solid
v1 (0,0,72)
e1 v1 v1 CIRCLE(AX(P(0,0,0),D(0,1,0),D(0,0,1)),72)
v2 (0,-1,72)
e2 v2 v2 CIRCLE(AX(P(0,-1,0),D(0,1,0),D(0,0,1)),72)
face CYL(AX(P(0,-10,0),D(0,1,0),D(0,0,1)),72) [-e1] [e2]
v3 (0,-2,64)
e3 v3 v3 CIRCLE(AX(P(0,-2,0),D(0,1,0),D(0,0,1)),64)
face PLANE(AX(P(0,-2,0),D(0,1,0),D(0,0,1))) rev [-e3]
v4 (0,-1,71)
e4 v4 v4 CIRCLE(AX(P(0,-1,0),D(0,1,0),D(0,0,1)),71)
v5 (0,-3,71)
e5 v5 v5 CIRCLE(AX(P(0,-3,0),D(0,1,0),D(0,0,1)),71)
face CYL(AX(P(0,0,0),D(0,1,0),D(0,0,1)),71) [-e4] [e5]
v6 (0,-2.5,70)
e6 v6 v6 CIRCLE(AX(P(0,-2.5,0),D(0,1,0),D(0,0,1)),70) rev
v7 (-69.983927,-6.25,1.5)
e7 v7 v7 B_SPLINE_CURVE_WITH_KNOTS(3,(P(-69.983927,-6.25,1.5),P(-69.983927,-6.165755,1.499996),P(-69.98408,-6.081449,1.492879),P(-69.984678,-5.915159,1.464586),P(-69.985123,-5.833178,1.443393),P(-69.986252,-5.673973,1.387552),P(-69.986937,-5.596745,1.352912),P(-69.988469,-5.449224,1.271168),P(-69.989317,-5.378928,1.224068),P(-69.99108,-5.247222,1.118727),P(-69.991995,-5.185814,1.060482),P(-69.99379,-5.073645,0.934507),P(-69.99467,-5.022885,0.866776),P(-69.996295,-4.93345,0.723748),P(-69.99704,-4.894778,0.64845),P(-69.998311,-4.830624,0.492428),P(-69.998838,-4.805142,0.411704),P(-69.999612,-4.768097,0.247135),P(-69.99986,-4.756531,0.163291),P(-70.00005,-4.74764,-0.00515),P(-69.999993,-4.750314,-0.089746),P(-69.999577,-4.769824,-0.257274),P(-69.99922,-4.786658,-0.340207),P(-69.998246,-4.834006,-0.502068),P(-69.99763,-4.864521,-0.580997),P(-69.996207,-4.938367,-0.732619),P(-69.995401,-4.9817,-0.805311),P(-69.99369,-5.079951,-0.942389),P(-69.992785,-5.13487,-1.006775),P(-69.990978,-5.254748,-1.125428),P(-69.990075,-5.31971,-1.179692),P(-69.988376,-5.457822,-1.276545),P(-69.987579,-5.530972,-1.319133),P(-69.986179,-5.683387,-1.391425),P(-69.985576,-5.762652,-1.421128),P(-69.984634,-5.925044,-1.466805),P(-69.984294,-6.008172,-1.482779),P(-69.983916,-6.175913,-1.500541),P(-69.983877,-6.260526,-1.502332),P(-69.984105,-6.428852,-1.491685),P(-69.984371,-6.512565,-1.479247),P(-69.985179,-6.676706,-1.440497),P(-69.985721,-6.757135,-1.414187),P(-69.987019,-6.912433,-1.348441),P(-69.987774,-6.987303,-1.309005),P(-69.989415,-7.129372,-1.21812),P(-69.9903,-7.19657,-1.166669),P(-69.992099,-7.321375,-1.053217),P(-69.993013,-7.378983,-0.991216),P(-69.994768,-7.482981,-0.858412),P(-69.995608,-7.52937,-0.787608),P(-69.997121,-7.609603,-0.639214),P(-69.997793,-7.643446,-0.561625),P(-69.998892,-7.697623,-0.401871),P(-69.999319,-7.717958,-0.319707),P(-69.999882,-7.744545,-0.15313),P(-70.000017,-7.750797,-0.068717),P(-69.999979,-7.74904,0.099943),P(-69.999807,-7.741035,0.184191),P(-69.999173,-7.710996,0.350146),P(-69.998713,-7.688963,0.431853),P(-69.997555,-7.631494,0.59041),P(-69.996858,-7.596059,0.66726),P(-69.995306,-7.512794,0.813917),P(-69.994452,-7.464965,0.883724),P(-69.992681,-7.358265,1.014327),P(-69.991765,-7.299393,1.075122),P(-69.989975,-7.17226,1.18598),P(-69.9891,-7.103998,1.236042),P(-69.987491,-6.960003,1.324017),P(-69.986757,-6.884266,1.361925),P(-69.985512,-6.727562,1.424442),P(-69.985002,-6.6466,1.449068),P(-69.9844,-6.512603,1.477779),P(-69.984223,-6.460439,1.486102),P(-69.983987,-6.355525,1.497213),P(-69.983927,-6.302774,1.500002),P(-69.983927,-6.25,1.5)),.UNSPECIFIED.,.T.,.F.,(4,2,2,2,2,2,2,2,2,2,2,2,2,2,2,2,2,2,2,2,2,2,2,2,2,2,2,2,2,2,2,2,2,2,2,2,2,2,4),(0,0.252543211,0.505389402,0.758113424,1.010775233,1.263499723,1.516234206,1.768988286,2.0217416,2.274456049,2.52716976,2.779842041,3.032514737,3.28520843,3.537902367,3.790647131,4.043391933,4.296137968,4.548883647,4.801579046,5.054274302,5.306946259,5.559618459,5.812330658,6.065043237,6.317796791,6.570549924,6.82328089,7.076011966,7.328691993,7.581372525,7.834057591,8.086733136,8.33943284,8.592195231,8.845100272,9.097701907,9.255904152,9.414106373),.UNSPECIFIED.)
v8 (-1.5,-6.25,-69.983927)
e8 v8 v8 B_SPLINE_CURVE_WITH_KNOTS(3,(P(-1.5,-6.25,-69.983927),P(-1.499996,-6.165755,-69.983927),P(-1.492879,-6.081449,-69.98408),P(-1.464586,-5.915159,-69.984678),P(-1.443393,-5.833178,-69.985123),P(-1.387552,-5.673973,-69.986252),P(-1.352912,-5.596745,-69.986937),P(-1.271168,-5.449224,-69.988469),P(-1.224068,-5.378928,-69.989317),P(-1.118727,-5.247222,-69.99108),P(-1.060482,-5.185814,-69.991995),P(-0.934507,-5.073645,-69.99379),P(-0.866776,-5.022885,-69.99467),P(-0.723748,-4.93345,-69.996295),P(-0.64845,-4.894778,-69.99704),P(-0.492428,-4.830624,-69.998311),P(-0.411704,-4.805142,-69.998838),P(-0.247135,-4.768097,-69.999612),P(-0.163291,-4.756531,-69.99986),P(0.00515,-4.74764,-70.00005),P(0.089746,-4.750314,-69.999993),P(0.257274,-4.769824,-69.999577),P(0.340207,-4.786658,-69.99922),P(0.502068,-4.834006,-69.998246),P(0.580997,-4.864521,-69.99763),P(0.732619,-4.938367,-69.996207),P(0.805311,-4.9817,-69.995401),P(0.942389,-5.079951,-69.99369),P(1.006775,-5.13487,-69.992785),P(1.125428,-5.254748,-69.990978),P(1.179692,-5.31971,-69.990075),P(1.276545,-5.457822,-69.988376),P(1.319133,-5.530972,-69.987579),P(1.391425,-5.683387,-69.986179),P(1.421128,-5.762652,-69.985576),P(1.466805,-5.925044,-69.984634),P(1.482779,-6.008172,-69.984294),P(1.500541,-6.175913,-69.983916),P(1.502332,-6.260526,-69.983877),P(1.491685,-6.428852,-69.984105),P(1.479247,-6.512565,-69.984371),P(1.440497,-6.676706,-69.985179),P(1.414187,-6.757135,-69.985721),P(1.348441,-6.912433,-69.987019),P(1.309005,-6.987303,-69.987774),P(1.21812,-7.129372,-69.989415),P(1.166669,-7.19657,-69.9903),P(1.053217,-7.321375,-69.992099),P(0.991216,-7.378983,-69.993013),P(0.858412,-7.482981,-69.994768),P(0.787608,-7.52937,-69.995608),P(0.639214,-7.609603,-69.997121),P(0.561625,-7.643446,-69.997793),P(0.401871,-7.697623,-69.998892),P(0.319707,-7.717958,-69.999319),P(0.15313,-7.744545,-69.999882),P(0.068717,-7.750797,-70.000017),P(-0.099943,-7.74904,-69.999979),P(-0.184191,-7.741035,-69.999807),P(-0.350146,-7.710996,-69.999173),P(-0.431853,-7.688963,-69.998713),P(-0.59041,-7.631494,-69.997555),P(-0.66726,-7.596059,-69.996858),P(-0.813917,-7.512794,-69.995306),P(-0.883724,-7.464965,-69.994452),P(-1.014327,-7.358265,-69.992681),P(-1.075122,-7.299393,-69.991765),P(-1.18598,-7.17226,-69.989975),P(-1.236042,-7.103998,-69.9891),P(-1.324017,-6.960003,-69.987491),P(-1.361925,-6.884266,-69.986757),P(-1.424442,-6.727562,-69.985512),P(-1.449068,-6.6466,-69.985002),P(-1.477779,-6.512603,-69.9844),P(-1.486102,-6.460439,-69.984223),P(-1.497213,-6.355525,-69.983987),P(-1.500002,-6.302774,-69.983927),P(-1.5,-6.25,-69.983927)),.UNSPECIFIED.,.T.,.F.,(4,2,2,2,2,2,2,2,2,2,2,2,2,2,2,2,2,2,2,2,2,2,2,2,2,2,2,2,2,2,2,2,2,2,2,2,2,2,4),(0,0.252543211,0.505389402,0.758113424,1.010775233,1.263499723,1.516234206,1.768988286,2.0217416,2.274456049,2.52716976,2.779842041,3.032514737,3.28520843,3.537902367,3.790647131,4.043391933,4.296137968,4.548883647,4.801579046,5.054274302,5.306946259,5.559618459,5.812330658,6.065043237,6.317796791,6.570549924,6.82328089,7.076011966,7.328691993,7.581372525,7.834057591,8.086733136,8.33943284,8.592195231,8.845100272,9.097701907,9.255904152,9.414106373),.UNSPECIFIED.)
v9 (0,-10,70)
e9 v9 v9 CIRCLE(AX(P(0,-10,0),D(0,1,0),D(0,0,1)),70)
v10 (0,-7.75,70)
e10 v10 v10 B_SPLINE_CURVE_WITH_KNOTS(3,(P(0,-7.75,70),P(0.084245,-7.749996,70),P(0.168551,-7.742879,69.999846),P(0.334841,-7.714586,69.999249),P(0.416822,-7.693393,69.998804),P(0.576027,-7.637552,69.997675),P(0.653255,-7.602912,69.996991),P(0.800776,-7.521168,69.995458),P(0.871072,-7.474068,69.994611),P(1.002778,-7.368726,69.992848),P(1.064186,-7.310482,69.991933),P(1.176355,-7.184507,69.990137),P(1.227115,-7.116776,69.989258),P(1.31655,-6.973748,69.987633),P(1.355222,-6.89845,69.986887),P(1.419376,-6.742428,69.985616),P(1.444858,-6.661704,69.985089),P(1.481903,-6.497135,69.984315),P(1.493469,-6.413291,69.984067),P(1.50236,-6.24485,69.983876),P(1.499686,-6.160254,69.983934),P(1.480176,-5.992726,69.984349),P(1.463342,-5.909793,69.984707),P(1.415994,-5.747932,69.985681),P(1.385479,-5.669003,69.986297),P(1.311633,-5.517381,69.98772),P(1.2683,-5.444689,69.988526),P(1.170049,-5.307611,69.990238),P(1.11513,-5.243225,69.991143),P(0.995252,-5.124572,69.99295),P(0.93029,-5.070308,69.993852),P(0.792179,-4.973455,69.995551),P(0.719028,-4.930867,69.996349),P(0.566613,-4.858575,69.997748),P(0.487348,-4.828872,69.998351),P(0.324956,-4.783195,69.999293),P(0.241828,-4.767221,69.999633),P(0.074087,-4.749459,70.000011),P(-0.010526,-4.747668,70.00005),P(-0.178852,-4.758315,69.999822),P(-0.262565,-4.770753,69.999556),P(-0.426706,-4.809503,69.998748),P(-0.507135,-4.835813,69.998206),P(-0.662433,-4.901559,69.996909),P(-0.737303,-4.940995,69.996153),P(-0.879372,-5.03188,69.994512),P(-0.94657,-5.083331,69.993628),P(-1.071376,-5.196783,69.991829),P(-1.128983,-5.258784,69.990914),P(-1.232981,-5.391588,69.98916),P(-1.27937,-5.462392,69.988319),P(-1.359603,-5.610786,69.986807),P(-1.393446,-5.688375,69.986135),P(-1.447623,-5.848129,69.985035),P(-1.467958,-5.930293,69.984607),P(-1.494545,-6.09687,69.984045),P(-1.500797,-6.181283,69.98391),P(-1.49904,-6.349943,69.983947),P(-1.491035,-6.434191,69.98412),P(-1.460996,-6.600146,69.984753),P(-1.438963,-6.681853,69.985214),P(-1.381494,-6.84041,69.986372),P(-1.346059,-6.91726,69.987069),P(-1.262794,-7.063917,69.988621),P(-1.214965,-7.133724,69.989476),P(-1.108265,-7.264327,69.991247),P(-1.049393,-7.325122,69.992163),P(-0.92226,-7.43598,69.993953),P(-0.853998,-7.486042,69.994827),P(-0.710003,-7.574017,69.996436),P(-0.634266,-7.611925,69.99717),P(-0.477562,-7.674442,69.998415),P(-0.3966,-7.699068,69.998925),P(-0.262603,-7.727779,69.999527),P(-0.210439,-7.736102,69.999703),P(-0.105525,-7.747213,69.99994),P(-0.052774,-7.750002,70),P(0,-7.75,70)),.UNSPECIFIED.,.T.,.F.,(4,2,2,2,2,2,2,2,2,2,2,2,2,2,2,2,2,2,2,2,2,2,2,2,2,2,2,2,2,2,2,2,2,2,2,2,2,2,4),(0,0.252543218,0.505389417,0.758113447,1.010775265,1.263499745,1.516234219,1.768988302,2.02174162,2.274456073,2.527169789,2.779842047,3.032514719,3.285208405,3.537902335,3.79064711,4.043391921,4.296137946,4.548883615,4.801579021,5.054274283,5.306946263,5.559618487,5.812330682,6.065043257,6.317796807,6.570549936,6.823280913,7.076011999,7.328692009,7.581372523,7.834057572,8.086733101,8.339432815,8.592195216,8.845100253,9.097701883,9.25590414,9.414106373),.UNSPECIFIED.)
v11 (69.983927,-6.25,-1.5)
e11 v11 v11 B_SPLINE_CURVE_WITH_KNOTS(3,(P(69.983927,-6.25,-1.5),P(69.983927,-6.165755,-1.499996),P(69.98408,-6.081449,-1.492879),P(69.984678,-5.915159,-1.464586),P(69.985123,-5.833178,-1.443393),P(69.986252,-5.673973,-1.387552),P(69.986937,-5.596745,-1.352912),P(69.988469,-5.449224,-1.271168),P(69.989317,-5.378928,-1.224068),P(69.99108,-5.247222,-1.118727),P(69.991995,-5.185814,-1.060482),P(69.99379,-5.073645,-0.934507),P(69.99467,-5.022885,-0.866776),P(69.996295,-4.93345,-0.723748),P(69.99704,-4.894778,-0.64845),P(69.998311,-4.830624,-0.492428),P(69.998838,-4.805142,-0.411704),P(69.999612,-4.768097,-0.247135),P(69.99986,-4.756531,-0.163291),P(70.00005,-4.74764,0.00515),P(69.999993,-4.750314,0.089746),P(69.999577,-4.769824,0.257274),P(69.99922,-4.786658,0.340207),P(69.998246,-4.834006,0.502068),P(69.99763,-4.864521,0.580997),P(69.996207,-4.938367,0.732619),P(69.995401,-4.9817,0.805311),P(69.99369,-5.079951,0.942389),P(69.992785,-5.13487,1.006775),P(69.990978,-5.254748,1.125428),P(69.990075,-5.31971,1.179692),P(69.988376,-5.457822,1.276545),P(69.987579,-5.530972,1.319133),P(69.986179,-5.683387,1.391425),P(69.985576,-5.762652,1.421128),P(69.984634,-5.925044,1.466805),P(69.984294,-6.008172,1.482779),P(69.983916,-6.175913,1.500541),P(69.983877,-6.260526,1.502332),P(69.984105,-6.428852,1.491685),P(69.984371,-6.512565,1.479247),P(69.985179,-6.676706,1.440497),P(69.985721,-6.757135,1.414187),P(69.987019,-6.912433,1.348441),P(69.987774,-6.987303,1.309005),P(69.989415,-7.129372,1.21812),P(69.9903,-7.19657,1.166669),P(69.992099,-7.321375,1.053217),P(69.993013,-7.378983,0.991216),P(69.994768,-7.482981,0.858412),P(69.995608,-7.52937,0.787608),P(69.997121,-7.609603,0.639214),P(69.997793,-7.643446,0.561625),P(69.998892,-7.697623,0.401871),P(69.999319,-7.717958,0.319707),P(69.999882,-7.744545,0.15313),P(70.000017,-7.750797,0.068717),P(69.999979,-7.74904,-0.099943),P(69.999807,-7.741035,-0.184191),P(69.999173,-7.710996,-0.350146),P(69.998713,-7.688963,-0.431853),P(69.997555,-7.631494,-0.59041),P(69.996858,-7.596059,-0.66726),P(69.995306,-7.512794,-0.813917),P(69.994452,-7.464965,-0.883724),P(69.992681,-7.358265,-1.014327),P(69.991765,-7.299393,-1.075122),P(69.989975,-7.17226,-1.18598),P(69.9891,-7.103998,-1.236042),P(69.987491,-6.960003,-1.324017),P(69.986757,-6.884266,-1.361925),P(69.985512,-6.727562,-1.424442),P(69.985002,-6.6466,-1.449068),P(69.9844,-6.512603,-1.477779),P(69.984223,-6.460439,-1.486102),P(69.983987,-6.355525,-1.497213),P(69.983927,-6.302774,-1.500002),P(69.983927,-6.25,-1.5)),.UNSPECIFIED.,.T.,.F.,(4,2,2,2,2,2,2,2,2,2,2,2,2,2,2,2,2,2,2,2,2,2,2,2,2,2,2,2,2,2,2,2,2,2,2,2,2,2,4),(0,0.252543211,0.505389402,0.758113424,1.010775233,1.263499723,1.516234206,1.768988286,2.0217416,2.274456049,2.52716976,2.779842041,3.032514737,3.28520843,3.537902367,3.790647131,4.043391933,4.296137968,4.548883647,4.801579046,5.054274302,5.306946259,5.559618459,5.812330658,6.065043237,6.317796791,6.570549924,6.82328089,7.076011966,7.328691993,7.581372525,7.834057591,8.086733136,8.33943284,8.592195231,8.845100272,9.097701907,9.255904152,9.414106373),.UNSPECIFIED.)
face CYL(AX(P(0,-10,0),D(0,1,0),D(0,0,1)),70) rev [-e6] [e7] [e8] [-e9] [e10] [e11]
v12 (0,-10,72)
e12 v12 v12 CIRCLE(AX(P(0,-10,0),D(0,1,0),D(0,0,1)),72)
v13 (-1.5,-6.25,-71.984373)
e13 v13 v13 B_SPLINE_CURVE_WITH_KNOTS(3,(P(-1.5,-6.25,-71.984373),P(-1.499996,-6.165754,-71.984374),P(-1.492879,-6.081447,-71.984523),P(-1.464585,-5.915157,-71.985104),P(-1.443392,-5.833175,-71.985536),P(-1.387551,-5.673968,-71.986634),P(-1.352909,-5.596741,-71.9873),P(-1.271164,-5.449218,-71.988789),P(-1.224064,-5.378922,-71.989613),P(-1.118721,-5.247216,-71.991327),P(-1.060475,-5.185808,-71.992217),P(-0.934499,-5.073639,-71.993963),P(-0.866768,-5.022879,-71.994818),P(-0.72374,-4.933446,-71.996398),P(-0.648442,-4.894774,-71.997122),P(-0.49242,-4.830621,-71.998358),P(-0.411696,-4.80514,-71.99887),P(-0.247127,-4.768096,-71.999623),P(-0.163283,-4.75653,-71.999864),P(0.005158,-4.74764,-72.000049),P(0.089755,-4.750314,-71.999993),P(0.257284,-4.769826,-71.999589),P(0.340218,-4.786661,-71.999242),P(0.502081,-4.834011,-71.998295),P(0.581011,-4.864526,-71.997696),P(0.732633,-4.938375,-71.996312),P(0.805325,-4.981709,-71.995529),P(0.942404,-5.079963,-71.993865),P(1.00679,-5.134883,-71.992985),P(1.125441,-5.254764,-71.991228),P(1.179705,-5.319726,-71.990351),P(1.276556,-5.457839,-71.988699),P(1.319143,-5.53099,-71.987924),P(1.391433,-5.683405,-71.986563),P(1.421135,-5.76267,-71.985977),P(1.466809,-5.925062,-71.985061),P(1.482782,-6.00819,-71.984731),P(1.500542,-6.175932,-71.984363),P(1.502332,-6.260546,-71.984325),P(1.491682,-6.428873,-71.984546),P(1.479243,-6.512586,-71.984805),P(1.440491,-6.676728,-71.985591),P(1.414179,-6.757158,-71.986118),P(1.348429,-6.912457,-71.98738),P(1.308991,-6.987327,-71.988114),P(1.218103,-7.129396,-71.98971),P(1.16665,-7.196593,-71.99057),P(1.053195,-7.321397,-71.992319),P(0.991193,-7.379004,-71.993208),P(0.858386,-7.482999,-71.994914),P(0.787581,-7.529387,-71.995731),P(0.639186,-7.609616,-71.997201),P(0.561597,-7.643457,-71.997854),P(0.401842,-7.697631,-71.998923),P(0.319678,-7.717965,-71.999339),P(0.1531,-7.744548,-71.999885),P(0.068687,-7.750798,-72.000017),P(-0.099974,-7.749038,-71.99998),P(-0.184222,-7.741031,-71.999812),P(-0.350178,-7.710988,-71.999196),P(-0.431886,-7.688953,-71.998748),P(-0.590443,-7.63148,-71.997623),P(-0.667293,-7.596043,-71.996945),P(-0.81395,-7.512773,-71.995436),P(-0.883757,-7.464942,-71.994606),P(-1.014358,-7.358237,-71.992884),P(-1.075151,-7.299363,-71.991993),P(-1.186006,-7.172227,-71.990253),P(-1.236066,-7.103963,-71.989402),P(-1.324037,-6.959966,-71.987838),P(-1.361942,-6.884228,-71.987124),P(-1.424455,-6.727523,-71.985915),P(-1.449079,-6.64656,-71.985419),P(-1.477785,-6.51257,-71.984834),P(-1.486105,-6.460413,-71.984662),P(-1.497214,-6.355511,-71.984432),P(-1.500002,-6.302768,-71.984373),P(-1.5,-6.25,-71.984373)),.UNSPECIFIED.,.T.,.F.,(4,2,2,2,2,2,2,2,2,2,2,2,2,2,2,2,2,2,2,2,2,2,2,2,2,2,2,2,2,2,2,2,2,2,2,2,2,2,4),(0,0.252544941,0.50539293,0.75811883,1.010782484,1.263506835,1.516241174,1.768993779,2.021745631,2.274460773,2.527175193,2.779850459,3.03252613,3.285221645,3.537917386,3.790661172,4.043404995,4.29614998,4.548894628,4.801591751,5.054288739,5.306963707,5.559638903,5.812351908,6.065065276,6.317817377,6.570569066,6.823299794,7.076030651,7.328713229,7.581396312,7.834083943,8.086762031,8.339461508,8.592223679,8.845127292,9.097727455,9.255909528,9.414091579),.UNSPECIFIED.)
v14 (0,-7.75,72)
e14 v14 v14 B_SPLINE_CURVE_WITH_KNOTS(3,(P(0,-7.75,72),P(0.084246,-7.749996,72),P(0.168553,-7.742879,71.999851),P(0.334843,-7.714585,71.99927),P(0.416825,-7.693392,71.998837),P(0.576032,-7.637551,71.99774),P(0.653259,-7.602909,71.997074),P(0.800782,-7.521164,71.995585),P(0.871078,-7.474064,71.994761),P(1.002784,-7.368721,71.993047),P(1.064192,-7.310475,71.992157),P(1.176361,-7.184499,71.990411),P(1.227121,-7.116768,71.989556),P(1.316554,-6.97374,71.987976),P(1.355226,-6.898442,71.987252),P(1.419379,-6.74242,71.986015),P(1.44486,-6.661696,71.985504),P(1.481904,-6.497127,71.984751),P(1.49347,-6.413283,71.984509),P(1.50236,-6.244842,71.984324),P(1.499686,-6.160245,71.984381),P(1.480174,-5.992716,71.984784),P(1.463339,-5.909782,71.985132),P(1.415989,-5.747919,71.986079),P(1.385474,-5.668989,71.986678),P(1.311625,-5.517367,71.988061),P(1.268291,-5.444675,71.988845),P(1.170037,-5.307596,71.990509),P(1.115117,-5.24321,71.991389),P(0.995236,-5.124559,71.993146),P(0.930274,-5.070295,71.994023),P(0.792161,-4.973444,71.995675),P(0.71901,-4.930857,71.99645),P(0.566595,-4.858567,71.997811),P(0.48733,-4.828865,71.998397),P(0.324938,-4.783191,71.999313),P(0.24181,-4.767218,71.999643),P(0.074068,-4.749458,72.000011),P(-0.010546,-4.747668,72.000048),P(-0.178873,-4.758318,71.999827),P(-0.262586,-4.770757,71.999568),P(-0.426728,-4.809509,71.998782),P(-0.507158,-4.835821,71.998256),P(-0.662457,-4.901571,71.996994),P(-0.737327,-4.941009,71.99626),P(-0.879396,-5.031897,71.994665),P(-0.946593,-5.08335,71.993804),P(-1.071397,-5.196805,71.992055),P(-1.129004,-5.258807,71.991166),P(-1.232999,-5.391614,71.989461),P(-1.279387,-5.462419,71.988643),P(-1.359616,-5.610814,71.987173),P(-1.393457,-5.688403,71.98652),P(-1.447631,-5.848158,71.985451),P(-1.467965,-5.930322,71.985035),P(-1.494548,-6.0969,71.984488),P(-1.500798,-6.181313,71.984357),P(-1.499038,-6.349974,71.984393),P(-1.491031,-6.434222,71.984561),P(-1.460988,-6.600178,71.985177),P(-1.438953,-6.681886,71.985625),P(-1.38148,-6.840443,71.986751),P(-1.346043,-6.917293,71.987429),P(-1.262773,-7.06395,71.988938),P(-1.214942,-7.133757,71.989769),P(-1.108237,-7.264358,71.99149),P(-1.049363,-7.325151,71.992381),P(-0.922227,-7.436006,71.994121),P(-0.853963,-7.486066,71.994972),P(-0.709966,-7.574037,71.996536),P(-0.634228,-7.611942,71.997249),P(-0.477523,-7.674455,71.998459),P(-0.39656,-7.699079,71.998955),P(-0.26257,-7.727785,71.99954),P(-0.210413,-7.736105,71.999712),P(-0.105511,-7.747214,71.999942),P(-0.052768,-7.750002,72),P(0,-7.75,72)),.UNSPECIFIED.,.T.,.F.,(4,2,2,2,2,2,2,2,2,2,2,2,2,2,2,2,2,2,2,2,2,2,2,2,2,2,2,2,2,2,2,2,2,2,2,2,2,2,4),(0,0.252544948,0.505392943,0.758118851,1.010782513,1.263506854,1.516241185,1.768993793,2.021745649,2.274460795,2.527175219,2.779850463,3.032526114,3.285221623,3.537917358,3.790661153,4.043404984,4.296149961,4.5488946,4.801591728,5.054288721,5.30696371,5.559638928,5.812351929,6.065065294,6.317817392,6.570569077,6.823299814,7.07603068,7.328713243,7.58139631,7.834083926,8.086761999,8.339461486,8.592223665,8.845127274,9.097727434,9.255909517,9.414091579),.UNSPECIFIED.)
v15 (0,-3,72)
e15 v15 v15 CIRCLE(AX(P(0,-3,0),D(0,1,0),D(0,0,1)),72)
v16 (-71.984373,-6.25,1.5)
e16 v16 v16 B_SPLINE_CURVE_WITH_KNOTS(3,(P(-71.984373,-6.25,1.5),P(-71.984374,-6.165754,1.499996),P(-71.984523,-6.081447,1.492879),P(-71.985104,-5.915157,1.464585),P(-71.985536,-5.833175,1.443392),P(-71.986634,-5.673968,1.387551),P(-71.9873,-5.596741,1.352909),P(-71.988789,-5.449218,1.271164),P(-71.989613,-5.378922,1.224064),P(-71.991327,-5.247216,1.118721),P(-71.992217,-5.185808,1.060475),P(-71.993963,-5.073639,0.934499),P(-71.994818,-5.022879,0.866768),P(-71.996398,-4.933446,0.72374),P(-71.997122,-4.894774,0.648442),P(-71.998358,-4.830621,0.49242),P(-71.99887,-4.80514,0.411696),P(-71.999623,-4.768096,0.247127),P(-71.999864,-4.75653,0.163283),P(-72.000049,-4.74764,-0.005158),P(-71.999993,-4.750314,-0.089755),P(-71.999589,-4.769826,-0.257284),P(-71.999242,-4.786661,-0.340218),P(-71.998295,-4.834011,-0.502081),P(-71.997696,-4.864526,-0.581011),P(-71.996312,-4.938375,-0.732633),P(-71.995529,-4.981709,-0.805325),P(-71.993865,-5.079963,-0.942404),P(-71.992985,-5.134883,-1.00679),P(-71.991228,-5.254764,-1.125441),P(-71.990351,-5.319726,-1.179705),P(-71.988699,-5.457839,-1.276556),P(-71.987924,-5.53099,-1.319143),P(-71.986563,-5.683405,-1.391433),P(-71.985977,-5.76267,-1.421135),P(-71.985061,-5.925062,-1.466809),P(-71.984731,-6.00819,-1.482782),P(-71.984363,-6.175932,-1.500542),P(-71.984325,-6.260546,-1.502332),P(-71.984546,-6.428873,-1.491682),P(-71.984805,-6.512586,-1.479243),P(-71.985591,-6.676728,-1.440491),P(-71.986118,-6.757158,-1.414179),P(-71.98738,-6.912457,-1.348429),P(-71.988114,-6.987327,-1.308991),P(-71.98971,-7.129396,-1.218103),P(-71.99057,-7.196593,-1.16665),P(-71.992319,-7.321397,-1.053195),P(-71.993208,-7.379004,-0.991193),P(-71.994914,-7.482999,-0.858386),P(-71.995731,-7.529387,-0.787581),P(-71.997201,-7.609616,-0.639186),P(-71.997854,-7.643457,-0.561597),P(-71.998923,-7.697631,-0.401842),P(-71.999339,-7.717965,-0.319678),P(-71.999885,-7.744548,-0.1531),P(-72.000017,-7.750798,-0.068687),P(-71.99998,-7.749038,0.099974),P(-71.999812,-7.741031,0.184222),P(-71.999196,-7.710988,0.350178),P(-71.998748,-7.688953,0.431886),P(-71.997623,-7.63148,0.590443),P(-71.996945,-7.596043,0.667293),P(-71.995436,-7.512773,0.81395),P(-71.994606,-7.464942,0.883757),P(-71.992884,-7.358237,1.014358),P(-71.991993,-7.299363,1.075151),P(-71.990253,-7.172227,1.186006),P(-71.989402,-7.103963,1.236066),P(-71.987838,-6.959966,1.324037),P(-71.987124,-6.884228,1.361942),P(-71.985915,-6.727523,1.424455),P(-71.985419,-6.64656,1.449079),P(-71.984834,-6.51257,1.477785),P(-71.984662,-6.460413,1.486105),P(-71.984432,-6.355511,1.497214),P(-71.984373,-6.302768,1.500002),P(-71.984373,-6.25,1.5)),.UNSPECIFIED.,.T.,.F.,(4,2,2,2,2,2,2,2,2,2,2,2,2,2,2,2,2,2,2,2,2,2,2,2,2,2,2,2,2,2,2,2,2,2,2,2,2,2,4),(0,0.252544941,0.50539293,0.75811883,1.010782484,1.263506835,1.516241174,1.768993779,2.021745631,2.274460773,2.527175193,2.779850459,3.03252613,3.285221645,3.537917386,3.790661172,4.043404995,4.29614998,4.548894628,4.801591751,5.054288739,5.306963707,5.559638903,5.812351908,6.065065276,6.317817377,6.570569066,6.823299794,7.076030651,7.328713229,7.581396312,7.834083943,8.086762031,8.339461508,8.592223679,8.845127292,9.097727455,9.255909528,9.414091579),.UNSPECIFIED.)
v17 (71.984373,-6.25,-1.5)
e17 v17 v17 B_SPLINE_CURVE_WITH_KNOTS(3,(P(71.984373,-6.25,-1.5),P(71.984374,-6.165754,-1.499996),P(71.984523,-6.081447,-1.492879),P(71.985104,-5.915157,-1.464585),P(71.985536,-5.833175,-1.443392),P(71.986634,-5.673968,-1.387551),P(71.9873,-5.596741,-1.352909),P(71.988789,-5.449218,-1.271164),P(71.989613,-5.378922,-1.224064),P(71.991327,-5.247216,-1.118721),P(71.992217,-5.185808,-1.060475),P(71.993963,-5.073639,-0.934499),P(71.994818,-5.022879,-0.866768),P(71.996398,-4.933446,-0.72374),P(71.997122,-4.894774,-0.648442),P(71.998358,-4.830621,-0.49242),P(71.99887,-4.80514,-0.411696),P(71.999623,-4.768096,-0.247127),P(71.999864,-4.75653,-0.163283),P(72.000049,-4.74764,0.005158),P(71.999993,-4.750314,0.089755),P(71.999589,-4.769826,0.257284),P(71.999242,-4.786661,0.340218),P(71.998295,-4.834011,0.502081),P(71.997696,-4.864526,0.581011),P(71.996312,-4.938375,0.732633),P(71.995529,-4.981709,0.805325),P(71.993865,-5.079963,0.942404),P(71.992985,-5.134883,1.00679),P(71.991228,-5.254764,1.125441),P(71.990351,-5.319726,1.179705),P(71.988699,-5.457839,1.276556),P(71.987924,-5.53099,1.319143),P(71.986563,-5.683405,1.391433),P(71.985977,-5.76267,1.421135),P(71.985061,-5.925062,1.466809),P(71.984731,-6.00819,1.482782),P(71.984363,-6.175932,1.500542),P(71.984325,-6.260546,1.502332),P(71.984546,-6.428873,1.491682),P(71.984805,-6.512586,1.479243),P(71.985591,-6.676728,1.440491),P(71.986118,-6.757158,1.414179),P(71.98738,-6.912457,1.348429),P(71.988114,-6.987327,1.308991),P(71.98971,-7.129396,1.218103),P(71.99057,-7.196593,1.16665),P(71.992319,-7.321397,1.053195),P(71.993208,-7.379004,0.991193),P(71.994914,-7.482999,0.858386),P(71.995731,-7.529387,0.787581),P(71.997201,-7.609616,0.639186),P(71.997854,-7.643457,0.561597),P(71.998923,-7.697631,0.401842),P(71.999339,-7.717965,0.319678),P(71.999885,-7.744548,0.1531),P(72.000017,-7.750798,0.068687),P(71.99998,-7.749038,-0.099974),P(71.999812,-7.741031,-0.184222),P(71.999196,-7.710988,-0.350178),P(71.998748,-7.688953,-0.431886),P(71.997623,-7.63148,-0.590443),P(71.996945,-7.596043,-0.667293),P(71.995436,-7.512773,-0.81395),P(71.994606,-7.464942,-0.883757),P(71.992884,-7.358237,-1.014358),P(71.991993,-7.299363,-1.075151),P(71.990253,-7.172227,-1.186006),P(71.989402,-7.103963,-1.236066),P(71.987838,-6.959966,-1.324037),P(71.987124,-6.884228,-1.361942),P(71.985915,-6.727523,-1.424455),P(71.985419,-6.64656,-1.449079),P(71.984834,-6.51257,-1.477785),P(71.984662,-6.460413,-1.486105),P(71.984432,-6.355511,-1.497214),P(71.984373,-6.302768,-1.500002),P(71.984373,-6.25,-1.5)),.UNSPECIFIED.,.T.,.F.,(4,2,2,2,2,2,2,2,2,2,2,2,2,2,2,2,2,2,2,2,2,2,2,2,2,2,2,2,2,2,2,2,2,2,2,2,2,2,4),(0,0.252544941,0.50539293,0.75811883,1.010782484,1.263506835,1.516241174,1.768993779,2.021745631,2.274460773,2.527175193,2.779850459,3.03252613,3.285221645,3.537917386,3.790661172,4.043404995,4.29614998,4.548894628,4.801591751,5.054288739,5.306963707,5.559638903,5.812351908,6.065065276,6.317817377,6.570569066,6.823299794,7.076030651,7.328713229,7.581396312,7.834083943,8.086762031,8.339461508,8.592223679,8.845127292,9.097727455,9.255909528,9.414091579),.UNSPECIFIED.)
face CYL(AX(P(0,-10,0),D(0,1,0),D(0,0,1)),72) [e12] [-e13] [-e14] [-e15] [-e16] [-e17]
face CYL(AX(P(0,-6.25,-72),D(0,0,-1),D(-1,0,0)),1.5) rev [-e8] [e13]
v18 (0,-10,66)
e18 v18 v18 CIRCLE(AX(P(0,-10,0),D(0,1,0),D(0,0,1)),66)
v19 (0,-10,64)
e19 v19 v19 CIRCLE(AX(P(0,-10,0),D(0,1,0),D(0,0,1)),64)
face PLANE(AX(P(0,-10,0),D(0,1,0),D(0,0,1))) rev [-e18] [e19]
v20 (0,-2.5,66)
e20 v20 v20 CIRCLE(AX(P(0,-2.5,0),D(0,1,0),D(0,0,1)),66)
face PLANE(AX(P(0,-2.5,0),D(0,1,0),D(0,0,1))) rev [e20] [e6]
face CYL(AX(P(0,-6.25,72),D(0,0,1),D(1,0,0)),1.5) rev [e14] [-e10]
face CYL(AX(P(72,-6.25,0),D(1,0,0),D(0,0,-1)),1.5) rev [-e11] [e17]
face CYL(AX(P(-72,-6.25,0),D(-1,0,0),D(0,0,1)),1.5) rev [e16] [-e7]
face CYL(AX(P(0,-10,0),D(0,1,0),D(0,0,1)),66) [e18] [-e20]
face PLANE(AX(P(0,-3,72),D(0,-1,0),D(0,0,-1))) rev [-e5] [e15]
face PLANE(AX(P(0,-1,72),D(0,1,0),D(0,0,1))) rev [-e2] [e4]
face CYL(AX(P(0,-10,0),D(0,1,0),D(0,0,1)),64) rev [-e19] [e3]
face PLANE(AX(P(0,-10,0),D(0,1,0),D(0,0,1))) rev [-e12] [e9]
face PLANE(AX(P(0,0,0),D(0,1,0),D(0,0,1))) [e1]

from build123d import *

# Parameters (mm, degrees)
SKETCH_9_R               = 72
SKETCH_9_R_2             = 70
EXTRUDE_9_DEPTH          = 10
SKETCH_9_18_R            = 70
SKETCH_9_18_R_2          = 66
EXTRUDE_10_DEPTH         = 2.5
SKETCH_9_19_R            = 66
EXTRUDE_11_DEPTH         = 10
SHELL_START              = -10
SHELL_2_OUTLINE_R        = 64
SHELL_2_DEPTH            = 8
F_3_0MM_1_REACH          = 163.118
F_3_0MM_1_BORE_R         = 1.5
PATTERN_CIRCULAR_1_COUNT = 4
SKETCH_15_W              = 1
SKETCH_15_H              = 2


# Read off the part's stored shape, not the designer's step: 薄殼2
with BuildPart() as part:
    # 草圖9 → 填料-伸長9 (new body)
    with BuildSketch(Plane(origin=(0, 0, 0), x_dir=(1, 0, 0), z_dir=(0, 1, 0))):
        with Locations(Location((0, 0, 0), (0, 0, 270))):
            Circle(SKETCH_9_R)
        with Locations(Location((0, 0, 0), (0, 0, 270))):
            Circle(SKETCH_9_R_2, mode=Mode.SUBTRACT)
    extrude(amount=-EXTRUDE_9_DEPTH)

    # 草圖9<18> → 填料-伸長10 (add)
    with BuildSketch(Plane(origin=(0, 0, 0), x_dir=(1, 0, 0), z_dir=(0, 1, 0))):
        with Locations(Location((0, 0, 0), (0, 0, 270))):
            Circle(SKETCH_9_18_R)
        with Locations(Location((0, 0, 0), (0, 0, 270))):
            Circle(SKETCH_9_18_R_2, mode=Mode.SUBTRACT)
    extrude(amount=-EXTRUDE_10_DEPTH)

    # 草圖9<19> → 填料-伸長11 (add)
    with BuildSketch(Plane(origin=(0, 0, 0), x_dir=(1, 0, 0), z_dir=(0, 1, 0))):
        with Locations(Location((0, 0, 0), (0, 0, 270))):
            Circle(SKETCH_9_19_R)
    extrude(amount=-EXTRUDE_11_DEPTH)

    # 薄殼2 outline → 薄殼2 (cut)
    with BuildSketch(Plane(origin=(0, 0, 0), x_dir=(1, 0, 0), z_dir=(0, 1, 0)).offset(SHELL_START)):
        Circle(SHELL_2_OUTLINE_R)
    extrude(amount=SHELL_2_DEPTH, mode=Mode.SUBTRACT)

    # Ø3.0mm 定位孔1 bore (on position points) → Ø3.0mm 定位孔1 (cut, up to next)
    with BuildSketch(Plane(origin=(0, -6.25, 72), x_dir=(1, 0, 0), z_dir=(0, 0, 1)), mode=Mode.PRIVATE) as f_3_0mm_1_sk1:
        Circle(F_3_0MM_1_BORE_R)
    f_3_0mm_1_tool1 = extrude(f_3_0mm_1_sk1.sketch, amount=-F_3_0MM_1_REACH, mode=Mode.PRIVATE) & part.part
    f_3_0mm_1 = f_3_0mm_1_tool1.solids().sort_by_distance((0, -6.25, 72))[0]
    add(f_3_0mm_1, mode=Mode.SUBTRACT)

    # 環狀複製排列1: Ø3.0mm 定位孔1 ×4 about axis
    pattern_circular_1_axis = Axis((0, -10, 0), (0, 1, 0))
    for i in range(1, PATTERN_CIRCULAR_1_COUNT):
        add(f_3_0mm_1.rotate(pattern_circular_1_axis, i * 360 / PATTERN_CIRCULAR_1_COUNT), mode=Mode.SUBTRACT)

    # 草圖15 → 除料-旋轉2 (revolve, cut)
    with BuildSketch(Plane(origin=(0, 0, 0), x_dir=(0, 0, -1), z_dir=(1, 0, 0))):
        with Locations((-71.5, -2)):
            Rectangle(SKETCH_15_W, SKETCH_15_H)
    revolve(axis=Axis((0, 0, 0), (0, -1, 0)), mode=Mode.SUBTRACT)


solid = part.part
